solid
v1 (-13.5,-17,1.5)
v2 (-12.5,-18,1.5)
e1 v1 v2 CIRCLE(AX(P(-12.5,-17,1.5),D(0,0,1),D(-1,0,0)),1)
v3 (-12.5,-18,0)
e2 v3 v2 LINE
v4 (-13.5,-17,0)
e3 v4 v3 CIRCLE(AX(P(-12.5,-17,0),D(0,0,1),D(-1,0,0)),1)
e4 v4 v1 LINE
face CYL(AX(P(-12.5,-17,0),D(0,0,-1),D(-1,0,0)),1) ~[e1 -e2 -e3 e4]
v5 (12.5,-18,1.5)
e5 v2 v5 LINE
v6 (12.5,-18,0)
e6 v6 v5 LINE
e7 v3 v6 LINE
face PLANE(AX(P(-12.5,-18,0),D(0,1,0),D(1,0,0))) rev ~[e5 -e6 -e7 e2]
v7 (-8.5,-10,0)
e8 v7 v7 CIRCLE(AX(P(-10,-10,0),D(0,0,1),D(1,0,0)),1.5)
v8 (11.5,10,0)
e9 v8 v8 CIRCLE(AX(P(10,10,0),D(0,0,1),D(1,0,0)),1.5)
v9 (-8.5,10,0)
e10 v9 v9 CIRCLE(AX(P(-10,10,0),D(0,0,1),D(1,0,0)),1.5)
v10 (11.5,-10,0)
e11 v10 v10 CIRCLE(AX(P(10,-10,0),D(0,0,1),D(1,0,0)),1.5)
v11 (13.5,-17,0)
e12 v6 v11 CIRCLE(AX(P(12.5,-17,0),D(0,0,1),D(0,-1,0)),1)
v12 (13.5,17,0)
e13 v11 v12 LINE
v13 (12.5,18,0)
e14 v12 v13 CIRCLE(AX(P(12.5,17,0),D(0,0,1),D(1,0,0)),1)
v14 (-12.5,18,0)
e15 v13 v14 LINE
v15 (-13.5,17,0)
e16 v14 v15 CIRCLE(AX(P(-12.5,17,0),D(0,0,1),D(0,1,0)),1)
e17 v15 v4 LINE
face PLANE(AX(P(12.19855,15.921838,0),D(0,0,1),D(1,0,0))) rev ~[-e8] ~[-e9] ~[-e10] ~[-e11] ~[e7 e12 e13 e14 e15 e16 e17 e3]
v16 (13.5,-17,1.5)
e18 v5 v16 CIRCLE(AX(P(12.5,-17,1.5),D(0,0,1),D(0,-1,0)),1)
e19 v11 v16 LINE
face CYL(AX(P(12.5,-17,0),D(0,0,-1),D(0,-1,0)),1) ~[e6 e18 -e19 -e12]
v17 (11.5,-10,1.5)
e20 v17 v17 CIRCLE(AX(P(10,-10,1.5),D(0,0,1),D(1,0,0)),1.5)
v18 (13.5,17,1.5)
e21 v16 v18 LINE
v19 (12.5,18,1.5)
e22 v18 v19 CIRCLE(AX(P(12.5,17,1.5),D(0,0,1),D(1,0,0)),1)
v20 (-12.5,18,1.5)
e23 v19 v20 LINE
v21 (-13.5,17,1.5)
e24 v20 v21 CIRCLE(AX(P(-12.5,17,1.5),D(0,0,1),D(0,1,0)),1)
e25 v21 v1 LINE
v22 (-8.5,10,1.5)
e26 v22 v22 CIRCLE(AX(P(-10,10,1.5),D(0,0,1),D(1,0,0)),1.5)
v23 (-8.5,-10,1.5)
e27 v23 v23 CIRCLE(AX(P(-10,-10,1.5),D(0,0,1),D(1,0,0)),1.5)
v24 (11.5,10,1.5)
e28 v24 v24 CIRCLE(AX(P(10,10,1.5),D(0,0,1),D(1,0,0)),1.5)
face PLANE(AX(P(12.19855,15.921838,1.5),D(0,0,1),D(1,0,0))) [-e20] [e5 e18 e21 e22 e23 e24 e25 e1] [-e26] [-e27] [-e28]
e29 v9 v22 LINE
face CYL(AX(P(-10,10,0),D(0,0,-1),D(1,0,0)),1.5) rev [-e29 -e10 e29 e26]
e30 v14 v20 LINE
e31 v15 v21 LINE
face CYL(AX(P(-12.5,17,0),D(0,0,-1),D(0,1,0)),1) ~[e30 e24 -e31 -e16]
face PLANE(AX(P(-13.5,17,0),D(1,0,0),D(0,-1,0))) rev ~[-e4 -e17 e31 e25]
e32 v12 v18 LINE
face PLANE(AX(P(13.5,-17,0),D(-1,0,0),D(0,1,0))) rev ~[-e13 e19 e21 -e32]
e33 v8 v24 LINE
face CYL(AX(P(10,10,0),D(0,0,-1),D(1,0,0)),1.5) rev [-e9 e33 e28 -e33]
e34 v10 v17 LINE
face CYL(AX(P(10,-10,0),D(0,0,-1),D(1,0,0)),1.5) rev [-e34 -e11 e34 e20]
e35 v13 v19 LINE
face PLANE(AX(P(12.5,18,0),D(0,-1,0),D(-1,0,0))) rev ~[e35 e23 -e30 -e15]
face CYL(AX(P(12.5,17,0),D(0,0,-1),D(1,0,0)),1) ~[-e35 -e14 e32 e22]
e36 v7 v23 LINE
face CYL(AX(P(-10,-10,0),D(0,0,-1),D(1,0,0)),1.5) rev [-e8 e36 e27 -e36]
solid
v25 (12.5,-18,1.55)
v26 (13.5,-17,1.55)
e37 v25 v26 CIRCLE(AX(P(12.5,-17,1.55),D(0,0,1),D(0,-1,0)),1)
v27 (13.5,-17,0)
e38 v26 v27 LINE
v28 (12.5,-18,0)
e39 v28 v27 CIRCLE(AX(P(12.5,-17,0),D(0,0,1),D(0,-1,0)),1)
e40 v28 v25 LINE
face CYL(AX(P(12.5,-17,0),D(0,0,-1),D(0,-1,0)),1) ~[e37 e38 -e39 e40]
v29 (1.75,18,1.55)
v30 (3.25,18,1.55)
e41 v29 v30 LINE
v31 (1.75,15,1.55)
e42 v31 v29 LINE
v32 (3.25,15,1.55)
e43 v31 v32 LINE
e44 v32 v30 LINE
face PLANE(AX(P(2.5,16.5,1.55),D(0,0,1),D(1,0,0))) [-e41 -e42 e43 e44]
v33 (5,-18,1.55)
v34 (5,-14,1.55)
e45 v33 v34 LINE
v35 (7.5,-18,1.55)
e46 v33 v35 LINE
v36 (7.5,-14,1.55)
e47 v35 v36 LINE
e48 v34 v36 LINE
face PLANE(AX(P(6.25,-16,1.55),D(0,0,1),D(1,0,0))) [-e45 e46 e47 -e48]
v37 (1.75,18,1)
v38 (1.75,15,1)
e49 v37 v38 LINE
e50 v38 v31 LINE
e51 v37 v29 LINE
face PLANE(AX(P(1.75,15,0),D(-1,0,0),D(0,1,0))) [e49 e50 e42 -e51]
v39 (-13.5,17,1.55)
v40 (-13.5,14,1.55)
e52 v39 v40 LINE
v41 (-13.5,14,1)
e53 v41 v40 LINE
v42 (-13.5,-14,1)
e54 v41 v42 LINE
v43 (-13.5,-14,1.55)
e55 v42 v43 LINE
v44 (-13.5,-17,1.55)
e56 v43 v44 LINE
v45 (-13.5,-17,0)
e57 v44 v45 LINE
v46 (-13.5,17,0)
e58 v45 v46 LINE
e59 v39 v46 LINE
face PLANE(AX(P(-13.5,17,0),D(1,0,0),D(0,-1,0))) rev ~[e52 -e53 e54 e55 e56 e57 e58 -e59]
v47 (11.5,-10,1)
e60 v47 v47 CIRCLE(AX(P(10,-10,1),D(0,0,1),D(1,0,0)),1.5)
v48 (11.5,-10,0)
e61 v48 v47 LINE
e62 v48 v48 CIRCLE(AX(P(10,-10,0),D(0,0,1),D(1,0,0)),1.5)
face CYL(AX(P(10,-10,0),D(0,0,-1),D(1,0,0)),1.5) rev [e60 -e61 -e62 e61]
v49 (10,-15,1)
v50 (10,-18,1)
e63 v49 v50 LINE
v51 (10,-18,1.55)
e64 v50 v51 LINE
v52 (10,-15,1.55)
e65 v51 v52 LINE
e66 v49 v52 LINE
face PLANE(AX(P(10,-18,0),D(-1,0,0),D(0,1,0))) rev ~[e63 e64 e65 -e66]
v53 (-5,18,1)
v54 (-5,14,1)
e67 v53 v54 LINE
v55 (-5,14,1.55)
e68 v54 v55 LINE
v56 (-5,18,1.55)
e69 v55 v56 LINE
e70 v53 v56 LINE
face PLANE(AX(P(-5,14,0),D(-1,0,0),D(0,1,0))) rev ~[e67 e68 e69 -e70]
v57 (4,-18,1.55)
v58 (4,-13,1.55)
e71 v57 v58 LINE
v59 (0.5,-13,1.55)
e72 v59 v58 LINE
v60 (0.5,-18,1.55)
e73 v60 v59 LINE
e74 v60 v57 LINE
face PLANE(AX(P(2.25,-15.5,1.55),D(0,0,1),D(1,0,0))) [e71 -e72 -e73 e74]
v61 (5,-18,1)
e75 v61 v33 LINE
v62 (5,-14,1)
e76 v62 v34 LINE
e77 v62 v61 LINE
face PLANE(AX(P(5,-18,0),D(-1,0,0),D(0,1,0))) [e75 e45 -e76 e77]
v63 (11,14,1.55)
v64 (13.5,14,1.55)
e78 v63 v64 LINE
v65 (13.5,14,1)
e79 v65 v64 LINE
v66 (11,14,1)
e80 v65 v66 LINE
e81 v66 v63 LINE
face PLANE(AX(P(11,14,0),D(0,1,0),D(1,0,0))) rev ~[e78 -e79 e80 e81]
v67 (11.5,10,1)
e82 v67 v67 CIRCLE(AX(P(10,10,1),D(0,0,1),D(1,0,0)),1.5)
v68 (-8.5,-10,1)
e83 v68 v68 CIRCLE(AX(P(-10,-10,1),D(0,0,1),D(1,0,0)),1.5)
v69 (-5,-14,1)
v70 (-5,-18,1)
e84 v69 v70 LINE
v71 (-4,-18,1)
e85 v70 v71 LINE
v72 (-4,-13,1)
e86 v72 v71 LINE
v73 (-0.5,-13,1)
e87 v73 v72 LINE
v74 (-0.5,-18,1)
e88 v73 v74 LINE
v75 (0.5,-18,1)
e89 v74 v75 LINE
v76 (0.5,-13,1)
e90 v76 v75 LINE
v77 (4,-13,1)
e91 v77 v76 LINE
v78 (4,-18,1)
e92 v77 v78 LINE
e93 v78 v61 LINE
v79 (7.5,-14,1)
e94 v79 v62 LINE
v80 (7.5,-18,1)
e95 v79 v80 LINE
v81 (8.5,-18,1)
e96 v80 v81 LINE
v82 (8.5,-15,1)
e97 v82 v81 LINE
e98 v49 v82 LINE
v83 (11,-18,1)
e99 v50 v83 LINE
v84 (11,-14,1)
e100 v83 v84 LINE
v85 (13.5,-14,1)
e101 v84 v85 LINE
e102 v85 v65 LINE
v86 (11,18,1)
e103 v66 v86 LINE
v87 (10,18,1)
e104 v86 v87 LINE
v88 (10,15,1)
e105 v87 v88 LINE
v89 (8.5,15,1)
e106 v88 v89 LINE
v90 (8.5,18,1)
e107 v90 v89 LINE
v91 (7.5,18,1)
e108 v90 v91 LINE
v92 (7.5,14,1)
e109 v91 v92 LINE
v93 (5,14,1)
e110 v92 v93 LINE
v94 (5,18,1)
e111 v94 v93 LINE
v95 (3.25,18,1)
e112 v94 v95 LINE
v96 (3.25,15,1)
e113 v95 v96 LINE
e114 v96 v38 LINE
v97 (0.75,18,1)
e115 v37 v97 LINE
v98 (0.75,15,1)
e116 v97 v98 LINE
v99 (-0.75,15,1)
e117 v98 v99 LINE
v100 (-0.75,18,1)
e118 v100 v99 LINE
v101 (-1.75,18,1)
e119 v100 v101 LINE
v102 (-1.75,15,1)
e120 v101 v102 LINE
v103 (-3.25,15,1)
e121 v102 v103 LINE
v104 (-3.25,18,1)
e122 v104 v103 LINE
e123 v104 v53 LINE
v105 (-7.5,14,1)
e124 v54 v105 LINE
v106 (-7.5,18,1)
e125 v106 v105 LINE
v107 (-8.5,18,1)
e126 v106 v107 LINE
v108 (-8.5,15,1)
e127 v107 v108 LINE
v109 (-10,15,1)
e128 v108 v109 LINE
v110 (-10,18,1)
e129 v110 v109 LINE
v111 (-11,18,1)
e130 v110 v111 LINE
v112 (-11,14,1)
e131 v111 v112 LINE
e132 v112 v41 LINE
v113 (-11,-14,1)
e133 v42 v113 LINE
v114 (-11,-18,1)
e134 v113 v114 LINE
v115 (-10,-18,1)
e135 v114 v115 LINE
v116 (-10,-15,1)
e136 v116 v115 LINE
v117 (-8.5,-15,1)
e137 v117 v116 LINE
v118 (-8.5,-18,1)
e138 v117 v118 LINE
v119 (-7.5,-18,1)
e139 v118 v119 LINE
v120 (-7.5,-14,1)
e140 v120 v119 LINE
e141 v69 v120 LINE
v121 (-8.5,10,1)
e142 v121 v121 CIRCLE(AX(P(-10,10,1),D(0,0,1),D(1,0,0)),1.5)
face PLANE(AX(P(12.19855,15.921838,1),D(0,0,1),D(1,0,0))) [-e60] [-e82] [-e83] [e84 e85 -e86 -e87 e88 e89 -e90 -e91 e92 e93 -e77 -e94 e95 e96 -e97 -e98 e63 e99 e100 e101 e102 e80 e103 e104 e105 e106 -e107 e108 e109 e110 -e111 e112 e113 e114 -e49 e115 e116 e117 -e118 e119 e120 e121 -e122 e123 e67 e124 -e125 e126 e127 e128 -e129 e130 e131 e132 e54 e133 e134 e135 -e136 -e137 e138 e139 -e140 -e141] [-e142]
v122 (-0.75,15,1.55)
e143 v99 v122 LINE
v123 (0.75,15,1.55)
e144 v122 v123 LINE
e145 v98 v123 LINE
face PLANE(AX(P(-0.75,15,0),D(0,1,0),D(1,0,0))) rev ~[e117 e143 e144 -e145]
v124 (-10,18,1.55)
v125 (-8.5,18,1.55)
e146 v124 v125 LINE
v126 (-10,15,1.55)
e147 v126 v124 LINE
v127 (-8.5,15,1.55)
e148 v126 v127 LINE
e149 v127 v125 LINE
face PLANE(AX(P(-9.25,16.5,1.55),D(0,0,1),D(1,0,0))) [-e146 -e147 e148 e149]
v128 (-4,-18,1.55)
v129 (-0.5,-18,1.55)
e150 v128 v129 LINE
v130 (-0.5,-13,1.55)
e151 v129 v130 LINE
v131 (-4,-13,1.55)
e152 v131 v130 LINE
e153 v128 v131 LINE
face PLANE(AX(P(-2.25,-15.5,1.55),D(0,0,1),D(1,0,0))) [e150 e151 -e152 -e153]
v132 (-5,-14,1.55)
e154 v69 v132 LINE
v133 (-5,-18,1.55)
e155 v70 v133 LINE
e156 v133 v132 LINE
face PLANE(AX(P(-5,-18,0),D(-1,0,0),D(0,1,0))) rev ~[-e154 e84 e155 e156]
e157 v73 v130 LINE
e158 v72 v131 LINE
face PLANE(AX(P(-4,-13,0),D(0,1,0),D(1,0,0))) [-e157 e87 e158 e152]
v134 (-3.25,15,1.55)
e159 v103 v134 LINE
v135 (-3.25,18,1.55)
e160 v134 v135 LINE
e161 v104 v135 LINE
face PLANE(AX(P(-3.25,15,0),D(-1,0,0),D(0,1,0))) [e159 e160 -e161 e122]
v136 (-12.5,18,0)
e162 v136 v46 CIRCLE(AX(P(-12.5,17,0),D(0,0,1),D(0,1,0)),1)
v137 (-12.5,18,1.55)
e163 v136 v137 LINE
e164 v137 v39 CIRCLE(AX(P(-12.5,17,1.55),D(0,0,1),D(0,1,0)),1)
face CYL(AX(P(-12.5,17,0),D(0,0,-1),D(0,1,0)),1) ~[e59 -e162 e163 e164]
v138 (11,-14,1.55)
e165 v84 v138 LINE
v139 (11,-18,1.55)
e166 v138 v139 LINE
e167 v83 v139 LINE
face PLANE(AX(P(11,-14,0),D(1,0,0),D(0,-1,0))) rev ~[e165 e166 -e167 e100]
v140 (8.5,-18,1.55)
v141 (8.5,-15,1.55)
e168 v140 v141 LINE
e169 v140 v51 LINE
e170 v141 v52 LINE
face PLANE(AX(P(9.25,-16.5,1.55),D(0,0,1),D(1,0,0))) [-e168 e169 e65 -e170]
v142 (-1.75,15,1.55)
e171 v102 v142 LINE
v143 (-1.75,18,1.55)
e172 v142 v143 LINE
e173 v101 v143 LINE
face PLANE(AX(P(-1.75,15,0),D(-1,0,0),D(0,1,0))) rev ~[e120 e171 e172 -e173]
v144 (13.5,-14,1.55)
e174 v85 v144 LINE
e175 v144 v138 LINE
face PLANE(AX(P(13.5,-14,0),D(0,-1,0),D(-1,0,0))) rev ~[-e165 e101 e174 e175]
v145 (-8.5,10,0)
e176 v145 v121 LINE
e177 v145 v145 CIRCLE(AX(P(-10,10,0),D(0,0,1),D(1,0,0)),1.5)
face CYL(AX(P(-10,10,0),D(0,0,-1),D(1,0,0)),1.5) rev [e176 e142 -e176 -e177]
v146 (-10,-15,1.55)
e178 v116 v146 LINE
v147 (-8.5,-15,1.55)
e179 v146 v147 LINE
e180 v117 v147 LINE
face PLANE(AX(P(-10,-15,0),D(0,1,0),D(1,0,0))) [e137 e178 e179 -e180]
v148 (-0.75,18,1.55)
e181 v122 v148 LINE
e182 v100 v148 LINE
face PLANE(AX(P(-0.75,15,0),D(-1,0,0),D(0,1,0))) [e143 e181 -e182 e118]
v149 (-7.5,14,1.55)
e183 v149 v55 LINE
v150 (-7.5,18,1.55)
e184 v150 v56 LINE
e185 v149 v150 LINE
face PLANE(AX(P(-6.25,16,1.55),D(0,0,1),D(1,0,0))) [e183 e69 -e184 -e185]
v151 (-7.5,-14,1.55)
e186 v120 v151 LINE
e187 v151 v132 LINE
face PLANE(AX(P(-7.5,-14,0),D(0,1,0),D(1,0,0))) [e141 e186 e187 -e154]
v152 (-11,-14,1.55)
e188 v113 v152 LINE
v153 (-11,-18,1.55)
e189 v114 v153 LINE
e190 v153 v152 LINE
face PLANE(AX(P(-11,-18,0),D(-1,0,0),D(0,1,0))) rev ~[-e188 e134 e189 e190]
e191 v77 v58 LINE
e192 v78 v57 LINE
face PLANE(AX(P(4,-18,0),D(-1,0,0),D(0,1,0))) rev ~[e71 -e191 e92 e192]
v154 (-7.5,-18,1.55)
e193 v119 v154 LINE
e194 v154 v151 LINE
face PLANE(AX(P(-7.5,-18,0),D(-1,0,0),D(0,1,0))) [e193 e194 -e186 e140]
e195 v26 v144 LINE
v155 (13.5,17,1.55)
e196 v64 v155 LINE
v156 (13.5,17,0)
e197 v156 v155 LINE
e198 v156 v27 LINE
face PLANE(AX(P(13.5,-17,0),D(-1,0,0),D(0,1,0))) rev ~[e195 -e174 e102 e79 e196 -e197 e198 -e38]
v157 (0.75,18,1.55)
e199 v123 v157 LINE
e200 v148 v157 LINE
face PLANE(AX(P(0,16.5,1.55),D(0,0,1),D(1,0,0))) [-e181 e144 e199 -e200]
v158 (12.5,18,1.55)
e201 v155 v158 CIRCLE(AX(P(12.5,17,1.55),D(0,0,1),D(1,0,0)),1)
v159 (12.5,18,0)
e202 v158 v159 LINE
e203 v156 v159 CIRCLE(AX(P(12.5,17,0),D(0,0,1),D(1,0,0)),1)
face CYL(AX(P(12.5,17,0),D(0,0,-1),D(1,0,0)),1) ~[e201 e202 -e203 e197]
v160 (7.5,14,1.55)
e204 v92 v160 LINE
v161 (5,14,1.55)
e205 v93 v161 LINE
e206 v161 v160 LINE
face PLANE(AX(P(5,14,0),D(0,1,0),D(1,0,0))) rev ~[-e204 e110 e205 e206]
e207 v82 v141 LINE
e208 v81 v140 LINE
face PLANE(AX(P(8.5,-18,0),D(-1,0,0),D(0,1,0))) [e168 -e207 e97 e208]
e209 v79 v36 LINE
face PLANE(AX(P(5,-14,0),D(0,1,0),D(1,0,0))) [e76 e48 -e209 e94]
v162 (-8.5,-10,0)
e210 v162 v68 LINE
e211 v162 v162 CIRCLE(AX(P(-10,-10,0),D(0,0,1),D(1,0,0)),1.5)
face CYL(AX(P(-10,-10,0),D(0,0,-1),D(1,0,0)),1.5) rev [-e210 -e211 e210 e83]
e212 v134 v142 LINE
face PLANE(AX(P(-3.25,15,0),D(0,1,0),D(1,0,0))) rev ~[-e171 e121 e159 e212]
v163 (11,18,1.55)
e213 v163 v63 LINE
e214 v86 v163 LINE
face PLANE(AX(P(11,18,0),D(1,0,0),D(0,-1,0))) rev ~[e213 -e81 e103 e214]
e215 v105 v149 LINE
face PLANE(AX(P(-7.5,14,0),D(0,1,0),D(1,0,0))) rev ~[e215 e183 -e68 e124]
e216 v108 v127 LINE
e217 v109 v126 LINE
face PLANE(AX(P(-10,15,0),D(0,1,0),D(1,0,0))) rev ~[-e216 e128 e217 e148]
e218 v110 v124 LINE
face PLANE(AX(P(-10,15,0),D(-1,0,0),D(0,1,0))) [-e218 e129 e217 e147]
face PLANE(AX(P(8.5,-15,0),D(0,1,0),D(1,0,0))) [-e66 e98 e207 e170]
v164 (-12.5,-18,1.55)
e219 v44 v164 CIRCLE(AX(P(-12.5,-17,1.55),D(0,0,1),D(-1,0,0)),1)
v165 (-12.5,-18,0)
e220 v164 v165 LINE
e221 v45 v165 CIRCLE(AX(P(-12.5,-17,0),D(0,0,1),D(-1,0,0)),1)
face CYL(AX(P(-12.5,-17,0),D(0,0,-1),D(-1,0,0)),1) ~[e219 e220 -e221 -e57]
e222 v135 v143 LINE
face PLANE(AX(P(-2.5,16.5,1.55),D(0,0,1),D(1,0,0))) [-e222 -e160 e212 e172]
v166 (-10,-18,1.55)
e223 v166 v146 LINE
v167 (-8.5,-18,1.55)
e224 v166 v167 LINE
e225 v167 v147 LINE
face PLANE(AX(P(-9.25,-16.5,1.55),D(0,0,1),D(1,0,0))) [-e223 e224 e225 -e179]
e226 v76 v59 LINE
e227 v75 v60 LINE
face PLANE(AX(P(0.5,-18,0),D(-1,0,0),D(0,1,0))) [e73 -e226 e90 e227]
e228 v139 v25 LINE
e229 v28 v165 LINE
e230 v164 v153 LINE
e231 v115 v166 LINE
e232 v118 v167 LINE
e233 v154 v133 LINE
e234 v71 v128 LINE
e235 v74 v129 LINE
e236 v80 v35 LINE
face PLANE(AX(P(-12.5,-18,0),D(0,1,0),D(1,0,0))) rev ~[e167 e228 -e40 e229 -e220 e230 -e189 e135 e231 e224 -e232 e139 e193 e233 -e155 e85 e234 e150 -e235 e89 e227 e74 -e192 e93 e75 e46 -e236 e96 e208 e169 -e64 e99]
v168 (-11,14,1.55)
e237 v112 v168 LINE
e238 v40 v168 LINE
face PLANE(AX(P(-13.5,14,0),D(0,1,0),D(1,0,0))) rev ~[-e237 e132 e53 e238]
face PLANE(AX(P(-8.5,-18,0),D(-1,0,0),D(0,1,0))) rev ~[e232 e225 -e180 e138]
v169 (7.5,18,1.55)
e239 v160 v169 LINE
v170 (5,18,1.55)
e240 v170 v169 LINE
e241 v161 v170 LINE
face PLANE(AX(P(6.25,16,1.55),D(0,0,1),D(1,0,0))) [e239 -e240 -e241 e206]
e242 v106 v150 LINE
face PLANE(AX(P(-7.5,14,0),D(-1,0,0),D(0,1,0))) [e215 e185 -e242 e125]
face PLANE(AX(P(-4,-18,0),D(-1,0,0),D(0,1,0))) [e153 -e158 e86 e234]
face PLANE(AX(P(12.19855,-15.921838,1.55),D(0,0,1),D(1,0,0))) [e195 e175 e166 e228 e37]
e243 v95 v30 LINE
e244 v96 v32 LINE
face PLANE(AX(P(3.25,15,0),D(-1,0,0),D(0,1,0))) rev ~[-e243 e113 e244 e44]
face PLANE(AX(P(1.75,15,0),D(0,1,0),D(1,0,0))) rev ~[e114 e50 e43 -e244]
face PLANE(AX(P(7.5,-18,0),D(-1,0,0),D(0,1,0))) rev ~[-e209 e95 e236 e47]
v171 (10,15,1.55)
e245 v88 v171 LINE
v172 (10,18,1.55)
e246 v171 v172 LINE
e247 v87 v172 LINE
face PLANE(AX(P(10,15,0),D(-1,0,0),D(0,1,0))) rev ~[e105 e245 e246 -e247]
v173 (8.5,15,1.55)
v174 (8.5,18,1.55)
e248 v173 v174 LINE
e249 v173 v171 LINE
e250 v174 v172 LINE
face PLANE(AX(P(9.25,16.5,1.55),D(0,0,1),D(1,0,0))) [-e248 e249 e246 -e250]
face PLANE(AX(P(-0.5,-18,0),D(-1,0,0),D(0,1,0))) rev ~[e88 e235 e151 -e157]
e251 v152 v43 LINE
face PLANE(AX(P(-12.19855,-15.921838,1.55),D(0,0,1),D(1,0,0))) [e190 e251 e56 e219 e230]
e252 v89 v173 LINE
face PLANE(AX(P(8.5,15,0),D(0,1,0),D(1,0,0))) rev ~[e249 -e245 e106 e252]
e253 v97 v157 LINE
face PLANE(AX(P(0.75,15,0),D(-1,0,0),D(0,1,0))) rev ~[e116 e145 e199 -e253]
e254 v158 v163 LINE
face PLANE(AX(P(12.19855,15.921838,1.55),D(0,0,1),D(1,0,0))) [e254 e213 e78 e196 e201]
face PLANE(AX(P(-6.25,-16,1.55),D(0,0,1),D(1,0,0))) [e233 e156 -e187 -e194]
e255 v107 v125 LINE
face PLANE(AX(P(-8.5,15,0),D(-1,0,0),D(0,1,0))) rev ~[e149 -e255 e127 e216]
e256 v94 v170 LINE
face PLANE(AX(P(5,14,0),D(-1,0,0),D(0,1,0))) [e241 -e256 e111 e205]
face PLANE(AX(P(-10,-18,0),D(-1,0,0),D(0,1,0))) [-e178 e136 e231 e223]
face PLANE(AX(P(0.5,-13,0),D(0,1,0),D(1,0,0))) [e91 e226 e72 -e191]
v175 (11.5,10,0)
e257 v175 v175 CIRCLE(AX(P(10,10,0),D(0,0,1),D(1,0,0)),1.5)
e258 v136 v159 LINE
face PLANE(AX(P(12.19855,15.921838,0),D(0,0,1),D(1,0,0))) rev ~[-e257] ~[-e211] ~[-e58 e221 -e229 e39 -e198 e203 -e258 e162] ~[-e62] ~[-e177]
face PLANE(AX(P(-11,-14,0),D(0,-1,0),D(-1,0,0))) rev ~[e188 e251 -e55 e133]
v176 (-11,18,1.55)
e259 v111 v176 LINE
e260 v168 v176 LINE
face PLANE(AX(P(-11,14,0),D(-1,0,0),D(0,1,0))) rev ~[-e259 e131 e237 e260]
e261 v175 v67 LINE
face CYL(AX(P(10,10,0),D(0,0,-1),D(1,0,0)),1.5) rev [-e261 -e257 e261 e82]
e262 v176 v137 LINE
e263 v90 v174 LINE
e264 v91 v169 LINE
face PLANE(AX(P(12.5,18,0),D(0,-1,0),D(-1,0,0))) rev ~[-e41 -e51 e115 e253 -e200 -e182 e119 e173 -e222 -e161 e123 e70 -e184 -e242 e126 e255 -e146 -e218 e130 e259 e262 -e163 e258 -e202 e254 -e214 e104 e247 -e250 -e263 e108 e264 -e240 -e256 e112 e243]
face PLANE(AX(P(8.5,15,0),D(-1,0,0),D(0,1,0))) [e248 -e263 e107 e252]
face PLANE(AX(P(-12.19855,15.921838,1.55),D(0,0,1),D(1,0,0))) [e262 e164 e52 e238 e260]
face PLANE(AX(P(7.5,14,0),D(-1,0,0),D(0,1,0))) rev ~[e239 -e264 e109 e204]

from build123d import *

# Parameters (mm, degrees)
F0_R     = 1.5
F0_W     = 1.5
F0_H     = 3
F0_W_2   = 2.5
F0_H_2   = 4
F0_W_3   = 3.5
F0_H_3   = 5
F1_DEPTH = 1.5
F2_DEPTH = 1
F3_DEPTH = 1.55


# Not quite as in the source:
# - a feature names something its author has since deleted; it is built from what else it names


with BuildPart() as f1:
    # F0 (on Top) → F1 (new body)
    with BuildSketch(Plane.XY):
        with BuildLine():
            ThreePointArc((13.5, 17), (13.2071067812, 17.7071067812), (12.5, 18))
            Line((12.5, 18), (11, 18))
            Line((11, 18), (11, 14))
            Line((11, 14), (13.5, 14))
            Line((13.5, 14), (13.5, 17))
        make_face()
        Polygon((11, 14), (11, 18), (10, 18), (10, 15), (8.5, 15), (8.5, 18), (7.5, 18), (7.5, 14), (5, 14), (5, 18), (3.25, 18), (3.25, 15), (1.75, 15), (1.75, 18), (0.75, 18), (0.75, 15), (-0.75, 15), (-0.75, 18), (-1.75, 18), (-1.75, 15), (-3.25, 15), (-3.25, 18), (-5, 18), (-5, 14), (-7.5, 14), (-7.5, 18), (-8.5, 18), (-8.5, 15), (-10, 15), (-10, 18), (-11, 18), (-11, 14), (-13.5, 14), (-13.5, -14), (-11, -14), (-11, -18), (-10, -18), (-10, -15), (-8.5, -15), (-8.5, -18), (-7.5, -18), (-7.5, -14), (-5, -14), (-5, -18), (-4, -18), (-4, -13), (-0.5, -13), (-0.5, -18), (0.5, -18), (0.5, -13), (4, -13), (4, -18), (5, -18), (5, -14), (7.5, -14), (7.5, -18), (8.5, -18), (8.5, -15), (10, -15), (10, -18), (11, -18), (11, -14), (13.5, -14), (13.5, 14), align=None)
        with Locations((-10, -10)):
            Circle(F0_R, mode=Mode.SUBTRACT)
        with Locations((10, -10)):
            Circle(F0_R, mode=Mode.SUBTRACT)
        with Locations((-10, 10)):
            Circle(F0_R, mode=Mode.SUBTRACT)
        with Locations((10, 10)):
            Circle(F0_R, mode=Mode.SUBTRACT)
        with Locations((9.25, 16.5)):
            Rectangle(F0_W, F0_H)
        with BuildLine():
            Line((13.5, -17), (13.5, -14))
            Line((13.5, -14), (11, -14))
            Line((11, -14), (11, -18))
            Line((11, -18), (12.5, -18))
            ThreePointArc((12.5, -18), (13.2071067812, -17.7071067812), (13.5, -17))
        make_face()
        with Locations((6.25, 16)):
            Rectangle(F0_W_2, F0_H_2)
        with Locations((2.5, 16.5)):
            Rectangle(F0_W, F0_H)
        with Locations((9.25, -16.5)):
            Rectangle(F0_W, F0_H)
        with Locations((0, 16.5)):
            Rectangle(F0_W, F0_H)
        with Locations((6.25, -16)):
            Rectangle(F0_W_2, F0_H_2)
        with Locations((-2.5, 16.5)):
            Rectangle(F0_W, F0_H)
        with Locations((2.25, -15.5)):
            Rectangle(F0_W_3, F0_H_3)
        with Locations((-6.25, 16)):
            Rectangle(F0_W_2, F0_H_2)
        with Locations((-2.25, -15.5)):
            Rectangle(F0_W_3, F0_H_3)
        with Locations((-9.25, 16.5)):
            Rectangle(F0_W, F0_H)
        with Locations((-6.25, -16)):
            Rectangle(F0_W_2, F0_H_2)
        with BuildLine():
            Line((-11, 14), (-11, 18))
            Line((-11, 18), (-12.5, 18))
            ThreePointArc((-12.5, 18), (-13.2071067812, 17.7071067812), (-13.5, 17))
            Line((-13.5, 17), (-13.5, 14))
            Line((-13.5, 14), (-11, 14))
        make_face()
        with Locations((-9.25, -16.5)):
            Rectangle(F0_W, F0_H)
        with BuildLine():
            Line((-12.5, -18), (-11, -18))
            Line((-11, -18), (-11, -14))
            Line((-11, -14), (-13.5, -14))
            Line((-13.5, -14), (-13.5, -17))
            ThreePointArc((-13.5, -17), (-13.2071067812, -17.7071067812), (-12.5, -18))
        make_face()
    extrude(amount=F1_DEPTH)


with BuildPart() as f2:
    # F0 (on Top) → F2 (new body)
    with BuildSketch(Plane.XY):
        with BuildLine():
            ThreePointArc((13.5, 17), (13.2071067812, 17.7071067812), (12.5, 18))
            Line((12.5, 18), (11, 18))
            Line((11, 18), (11, 14))
            Line((11, 14), (13.5, 14))
            Line((13.5, 14), (13.5, 17))
        make_face()
        Polygon((11, 14), (11, 18), (10, 18), (10, 15), (8.5, 15), (8.5, 18), (7.5, 18), (7.5, 14), (5, 14), (5, 18), (3.25, 18), (3.25, 15), (1.75, 15), (1.75, 18), (0.75, 18), (0.75, 15), (-0.75, 15), (-0.75, 18), (-1.75, 18), (-1.75, 15), (-3.25, 15), (-3.25, 18), (-5, 18), (-5, 14), (-7.5, 14), (-7.5, 18), (-8.5, 18), (-8.5, 15), (-10, 15), (-10, 18), (-11, 18), (-11, 14), (-13.5, 14), (-13.5, -14), (-11, -14), (-11, -18), (-10, -18), (-10, -15), (-8.5, -15), (-8.5, -18), (-7.5, -18), (-7.5, -14), (-5, -14), (-5, -18), (-4, -18), (-4, -13), (-0.5, -13), (-0.5, -18), (0.5, -18), (0.5, -13), (4, -13), (4, -18), (5, -18), (5, -14), (7.5, -14), (7.5, -18), (8.5, -18), (8.5, -15), (10, -15), (10, -18), (11, -18), (11, -14), (13.5, -14), (13.5, 14), align=None)
        with Locations((-10, -10)):
            Circle(F0_R, mode=Mode.SUBTRACT)
        with Locations((10, -10)):
            Circle(F0_R, mode=Mode.SUBTRACT)
        with Locations((-10, 10)):
            Circle(F0_R, mode=Mode.SUBTRACT)
        with Locations((10, 10)):
            Circle(F0_R, mode=Mode.SUBTRACT)
        with Locations((9.25, 16.5)):
            Rectangle(F0_W, F0_H)
        with BuildLine():
            Line((13.5, -17), (13.5, -14))
            Line((13.5, -14), (11, -14))
            Line((11, -14), (11, -18))
            Line((11, -18), (12.5, -18))
            ThreePointArc((12.5, -18), (13.2071067812, -17.7071067812), (13.5, -17))
        make_face()
        with Locations((6.25, 16)):
            Rectangle(F0_W_2, F0_H_2)
        with Locations((2.5, 16.5)):
            Rectangle(F0_W, F0_H)
        with Locations((9.25, -16.5)):
            Rectangle(F0_W, F0_H)
        with Locations((0, 16.5)):
            Rectangle(F0_W, F0_H)
        with Locations((6.25, -16)):
            Rectangle(F0_W_2, F0_H_2)
        with Locations((-2.5, 16.5)):
            Rectangle(F0_W, F0_H)
        with Locations((2.25, -15.5)):
            Rectangle(F0_W_3, F0_H_3)
        with Locations((-6.25, 16)):
            Rectangle(F0_W_2, F0_H_2)
        with Locations((-2.25, -15.5)):
            Rectangle(F0_W_3, F0_H_3)
        with Locations((-9.25, 16.5)):
            Rectangle(F0_W, F0_H)
        with Locations((-6.25, -16)):
            Rectangle(F0_W_2, F0_H_2)
        with BuildLine():
            Line((-11, 14), (-11, 18))
            Line((-11, 18), (-12.5, 18))
            ThreePointArc((-12.5, 18), (-13.2071067812, 17.7071067812), (-13.5, 17))
            Line((-13.5, 17), (-13.5, 14))
            Line((-13.5, 14), (-11, 14))
        make_face()
        with Locations((-9.25, -16.5)):
            Rectangle(F0_W, F0_H)
        with BuildLine():
            Line((-12.5, -18), (-11, -18))
            Line((-11, -18), (-11, -14))
            Line((-11, -14), (-13.5, -14))
            Line((-13.5, -14), (-13.5, -17))
            ThreePointArc((-13.5, -17), (-13.2071067812, -17.7071067812), (-12.5, -18))
        make_face()
    extrude(amount=F2_DEPTH)

    # F0 (on Top) → F3 (join)
    with BuildSketch(Plane.XY):
        with BuildLine():
            Line((-12.5, -18), (-11, -18))
            Line((-11, -18), (-11, -14))
            Line((-11, -14), (-13.5, -14))
            Line((-13.5, -14), (-13.5, -17))
            ThreePointArc((-13.5, -17), (-13.2071067812, -17.7071067812), (-12.5, -18))
        make_face()
        with Locations((-9.25, -16.5)):
            Rectangle(F0_W, F0_H)
        with Locations((-6.25, -16)):
            Rectangle(F0_W_2, F0_H_2)
        with Locations((-2.25, -15.5)):
            Rectangle(F0_W_3, F0_H_3)
        with Locations((2.25, -15.5)):
            Rectangle(F0_W_3, F0_H_3)
        with Locations((6.25, -16)):
            Rectangle(F0_W_2, F0_H_2)
        with Locations((9.25, -16.5)):
            Rectangle(F0_W, F0_H)
        with BuildLine():
            ThreePointArc((13.5, 17), (13.2071067812, 17.7071067812), (12.5, 18))
            Line((12.5, 18), (11, 18))
            Line((11, 18), (11, 14))
            Line((11, 14), (13.5, 14))
            Line((13.5, 14), (13.5, 17))
        make_face()
        with Locations((9.25, 16.5)):
            Rectangle(F0_W, F0_H)
        with Locations((6.25, 16)):
            Rectangle(F0_W_2, F0_H_2)
        with Locations((2.5, 16.5)):
            Rectangle(F0_W, F0_H)
        with Locations((0, 16.5)):
            Rectangle(F0_W, F0_H)
        with Locations((-2.5, 16.5)):
            Rectangle(F0_W, F0_H)
        with Locations((-6.25, 16)):
            Rectangle(F0_W_2, F0_H_2)
        with Locations((-9.25, 16.5)):
            Rectangle(F0_W, F0_H)
        with BuildLine():
            Line((-11, 14), (-11, 18))
            Line((-11, 18), (-12.5, 18))
            ThreePointArc((-12.5, 18), (-13.2071067812, 17.7071067812), (-13.5, 17))
            Line((-13.5, 17), (-13.5, 14))
            Line((-13.5, 14), (-11, 14))
        make_face()
        with BuildLine():
            Line((13.5, -17), (13.5, -14))
            Line((13.5, -14), (11, -14))
            Line((11, -14), (11, -18))
            Line((11, -18), (12.5, -18))
            ThreePointArc((12.5, -18), (13.2071067812, -17.7071067812), (13.5, -17))
        make_face()
    extrude(amount=F3_DEPTH)


solid = Compound([f1.part, f2.part])
